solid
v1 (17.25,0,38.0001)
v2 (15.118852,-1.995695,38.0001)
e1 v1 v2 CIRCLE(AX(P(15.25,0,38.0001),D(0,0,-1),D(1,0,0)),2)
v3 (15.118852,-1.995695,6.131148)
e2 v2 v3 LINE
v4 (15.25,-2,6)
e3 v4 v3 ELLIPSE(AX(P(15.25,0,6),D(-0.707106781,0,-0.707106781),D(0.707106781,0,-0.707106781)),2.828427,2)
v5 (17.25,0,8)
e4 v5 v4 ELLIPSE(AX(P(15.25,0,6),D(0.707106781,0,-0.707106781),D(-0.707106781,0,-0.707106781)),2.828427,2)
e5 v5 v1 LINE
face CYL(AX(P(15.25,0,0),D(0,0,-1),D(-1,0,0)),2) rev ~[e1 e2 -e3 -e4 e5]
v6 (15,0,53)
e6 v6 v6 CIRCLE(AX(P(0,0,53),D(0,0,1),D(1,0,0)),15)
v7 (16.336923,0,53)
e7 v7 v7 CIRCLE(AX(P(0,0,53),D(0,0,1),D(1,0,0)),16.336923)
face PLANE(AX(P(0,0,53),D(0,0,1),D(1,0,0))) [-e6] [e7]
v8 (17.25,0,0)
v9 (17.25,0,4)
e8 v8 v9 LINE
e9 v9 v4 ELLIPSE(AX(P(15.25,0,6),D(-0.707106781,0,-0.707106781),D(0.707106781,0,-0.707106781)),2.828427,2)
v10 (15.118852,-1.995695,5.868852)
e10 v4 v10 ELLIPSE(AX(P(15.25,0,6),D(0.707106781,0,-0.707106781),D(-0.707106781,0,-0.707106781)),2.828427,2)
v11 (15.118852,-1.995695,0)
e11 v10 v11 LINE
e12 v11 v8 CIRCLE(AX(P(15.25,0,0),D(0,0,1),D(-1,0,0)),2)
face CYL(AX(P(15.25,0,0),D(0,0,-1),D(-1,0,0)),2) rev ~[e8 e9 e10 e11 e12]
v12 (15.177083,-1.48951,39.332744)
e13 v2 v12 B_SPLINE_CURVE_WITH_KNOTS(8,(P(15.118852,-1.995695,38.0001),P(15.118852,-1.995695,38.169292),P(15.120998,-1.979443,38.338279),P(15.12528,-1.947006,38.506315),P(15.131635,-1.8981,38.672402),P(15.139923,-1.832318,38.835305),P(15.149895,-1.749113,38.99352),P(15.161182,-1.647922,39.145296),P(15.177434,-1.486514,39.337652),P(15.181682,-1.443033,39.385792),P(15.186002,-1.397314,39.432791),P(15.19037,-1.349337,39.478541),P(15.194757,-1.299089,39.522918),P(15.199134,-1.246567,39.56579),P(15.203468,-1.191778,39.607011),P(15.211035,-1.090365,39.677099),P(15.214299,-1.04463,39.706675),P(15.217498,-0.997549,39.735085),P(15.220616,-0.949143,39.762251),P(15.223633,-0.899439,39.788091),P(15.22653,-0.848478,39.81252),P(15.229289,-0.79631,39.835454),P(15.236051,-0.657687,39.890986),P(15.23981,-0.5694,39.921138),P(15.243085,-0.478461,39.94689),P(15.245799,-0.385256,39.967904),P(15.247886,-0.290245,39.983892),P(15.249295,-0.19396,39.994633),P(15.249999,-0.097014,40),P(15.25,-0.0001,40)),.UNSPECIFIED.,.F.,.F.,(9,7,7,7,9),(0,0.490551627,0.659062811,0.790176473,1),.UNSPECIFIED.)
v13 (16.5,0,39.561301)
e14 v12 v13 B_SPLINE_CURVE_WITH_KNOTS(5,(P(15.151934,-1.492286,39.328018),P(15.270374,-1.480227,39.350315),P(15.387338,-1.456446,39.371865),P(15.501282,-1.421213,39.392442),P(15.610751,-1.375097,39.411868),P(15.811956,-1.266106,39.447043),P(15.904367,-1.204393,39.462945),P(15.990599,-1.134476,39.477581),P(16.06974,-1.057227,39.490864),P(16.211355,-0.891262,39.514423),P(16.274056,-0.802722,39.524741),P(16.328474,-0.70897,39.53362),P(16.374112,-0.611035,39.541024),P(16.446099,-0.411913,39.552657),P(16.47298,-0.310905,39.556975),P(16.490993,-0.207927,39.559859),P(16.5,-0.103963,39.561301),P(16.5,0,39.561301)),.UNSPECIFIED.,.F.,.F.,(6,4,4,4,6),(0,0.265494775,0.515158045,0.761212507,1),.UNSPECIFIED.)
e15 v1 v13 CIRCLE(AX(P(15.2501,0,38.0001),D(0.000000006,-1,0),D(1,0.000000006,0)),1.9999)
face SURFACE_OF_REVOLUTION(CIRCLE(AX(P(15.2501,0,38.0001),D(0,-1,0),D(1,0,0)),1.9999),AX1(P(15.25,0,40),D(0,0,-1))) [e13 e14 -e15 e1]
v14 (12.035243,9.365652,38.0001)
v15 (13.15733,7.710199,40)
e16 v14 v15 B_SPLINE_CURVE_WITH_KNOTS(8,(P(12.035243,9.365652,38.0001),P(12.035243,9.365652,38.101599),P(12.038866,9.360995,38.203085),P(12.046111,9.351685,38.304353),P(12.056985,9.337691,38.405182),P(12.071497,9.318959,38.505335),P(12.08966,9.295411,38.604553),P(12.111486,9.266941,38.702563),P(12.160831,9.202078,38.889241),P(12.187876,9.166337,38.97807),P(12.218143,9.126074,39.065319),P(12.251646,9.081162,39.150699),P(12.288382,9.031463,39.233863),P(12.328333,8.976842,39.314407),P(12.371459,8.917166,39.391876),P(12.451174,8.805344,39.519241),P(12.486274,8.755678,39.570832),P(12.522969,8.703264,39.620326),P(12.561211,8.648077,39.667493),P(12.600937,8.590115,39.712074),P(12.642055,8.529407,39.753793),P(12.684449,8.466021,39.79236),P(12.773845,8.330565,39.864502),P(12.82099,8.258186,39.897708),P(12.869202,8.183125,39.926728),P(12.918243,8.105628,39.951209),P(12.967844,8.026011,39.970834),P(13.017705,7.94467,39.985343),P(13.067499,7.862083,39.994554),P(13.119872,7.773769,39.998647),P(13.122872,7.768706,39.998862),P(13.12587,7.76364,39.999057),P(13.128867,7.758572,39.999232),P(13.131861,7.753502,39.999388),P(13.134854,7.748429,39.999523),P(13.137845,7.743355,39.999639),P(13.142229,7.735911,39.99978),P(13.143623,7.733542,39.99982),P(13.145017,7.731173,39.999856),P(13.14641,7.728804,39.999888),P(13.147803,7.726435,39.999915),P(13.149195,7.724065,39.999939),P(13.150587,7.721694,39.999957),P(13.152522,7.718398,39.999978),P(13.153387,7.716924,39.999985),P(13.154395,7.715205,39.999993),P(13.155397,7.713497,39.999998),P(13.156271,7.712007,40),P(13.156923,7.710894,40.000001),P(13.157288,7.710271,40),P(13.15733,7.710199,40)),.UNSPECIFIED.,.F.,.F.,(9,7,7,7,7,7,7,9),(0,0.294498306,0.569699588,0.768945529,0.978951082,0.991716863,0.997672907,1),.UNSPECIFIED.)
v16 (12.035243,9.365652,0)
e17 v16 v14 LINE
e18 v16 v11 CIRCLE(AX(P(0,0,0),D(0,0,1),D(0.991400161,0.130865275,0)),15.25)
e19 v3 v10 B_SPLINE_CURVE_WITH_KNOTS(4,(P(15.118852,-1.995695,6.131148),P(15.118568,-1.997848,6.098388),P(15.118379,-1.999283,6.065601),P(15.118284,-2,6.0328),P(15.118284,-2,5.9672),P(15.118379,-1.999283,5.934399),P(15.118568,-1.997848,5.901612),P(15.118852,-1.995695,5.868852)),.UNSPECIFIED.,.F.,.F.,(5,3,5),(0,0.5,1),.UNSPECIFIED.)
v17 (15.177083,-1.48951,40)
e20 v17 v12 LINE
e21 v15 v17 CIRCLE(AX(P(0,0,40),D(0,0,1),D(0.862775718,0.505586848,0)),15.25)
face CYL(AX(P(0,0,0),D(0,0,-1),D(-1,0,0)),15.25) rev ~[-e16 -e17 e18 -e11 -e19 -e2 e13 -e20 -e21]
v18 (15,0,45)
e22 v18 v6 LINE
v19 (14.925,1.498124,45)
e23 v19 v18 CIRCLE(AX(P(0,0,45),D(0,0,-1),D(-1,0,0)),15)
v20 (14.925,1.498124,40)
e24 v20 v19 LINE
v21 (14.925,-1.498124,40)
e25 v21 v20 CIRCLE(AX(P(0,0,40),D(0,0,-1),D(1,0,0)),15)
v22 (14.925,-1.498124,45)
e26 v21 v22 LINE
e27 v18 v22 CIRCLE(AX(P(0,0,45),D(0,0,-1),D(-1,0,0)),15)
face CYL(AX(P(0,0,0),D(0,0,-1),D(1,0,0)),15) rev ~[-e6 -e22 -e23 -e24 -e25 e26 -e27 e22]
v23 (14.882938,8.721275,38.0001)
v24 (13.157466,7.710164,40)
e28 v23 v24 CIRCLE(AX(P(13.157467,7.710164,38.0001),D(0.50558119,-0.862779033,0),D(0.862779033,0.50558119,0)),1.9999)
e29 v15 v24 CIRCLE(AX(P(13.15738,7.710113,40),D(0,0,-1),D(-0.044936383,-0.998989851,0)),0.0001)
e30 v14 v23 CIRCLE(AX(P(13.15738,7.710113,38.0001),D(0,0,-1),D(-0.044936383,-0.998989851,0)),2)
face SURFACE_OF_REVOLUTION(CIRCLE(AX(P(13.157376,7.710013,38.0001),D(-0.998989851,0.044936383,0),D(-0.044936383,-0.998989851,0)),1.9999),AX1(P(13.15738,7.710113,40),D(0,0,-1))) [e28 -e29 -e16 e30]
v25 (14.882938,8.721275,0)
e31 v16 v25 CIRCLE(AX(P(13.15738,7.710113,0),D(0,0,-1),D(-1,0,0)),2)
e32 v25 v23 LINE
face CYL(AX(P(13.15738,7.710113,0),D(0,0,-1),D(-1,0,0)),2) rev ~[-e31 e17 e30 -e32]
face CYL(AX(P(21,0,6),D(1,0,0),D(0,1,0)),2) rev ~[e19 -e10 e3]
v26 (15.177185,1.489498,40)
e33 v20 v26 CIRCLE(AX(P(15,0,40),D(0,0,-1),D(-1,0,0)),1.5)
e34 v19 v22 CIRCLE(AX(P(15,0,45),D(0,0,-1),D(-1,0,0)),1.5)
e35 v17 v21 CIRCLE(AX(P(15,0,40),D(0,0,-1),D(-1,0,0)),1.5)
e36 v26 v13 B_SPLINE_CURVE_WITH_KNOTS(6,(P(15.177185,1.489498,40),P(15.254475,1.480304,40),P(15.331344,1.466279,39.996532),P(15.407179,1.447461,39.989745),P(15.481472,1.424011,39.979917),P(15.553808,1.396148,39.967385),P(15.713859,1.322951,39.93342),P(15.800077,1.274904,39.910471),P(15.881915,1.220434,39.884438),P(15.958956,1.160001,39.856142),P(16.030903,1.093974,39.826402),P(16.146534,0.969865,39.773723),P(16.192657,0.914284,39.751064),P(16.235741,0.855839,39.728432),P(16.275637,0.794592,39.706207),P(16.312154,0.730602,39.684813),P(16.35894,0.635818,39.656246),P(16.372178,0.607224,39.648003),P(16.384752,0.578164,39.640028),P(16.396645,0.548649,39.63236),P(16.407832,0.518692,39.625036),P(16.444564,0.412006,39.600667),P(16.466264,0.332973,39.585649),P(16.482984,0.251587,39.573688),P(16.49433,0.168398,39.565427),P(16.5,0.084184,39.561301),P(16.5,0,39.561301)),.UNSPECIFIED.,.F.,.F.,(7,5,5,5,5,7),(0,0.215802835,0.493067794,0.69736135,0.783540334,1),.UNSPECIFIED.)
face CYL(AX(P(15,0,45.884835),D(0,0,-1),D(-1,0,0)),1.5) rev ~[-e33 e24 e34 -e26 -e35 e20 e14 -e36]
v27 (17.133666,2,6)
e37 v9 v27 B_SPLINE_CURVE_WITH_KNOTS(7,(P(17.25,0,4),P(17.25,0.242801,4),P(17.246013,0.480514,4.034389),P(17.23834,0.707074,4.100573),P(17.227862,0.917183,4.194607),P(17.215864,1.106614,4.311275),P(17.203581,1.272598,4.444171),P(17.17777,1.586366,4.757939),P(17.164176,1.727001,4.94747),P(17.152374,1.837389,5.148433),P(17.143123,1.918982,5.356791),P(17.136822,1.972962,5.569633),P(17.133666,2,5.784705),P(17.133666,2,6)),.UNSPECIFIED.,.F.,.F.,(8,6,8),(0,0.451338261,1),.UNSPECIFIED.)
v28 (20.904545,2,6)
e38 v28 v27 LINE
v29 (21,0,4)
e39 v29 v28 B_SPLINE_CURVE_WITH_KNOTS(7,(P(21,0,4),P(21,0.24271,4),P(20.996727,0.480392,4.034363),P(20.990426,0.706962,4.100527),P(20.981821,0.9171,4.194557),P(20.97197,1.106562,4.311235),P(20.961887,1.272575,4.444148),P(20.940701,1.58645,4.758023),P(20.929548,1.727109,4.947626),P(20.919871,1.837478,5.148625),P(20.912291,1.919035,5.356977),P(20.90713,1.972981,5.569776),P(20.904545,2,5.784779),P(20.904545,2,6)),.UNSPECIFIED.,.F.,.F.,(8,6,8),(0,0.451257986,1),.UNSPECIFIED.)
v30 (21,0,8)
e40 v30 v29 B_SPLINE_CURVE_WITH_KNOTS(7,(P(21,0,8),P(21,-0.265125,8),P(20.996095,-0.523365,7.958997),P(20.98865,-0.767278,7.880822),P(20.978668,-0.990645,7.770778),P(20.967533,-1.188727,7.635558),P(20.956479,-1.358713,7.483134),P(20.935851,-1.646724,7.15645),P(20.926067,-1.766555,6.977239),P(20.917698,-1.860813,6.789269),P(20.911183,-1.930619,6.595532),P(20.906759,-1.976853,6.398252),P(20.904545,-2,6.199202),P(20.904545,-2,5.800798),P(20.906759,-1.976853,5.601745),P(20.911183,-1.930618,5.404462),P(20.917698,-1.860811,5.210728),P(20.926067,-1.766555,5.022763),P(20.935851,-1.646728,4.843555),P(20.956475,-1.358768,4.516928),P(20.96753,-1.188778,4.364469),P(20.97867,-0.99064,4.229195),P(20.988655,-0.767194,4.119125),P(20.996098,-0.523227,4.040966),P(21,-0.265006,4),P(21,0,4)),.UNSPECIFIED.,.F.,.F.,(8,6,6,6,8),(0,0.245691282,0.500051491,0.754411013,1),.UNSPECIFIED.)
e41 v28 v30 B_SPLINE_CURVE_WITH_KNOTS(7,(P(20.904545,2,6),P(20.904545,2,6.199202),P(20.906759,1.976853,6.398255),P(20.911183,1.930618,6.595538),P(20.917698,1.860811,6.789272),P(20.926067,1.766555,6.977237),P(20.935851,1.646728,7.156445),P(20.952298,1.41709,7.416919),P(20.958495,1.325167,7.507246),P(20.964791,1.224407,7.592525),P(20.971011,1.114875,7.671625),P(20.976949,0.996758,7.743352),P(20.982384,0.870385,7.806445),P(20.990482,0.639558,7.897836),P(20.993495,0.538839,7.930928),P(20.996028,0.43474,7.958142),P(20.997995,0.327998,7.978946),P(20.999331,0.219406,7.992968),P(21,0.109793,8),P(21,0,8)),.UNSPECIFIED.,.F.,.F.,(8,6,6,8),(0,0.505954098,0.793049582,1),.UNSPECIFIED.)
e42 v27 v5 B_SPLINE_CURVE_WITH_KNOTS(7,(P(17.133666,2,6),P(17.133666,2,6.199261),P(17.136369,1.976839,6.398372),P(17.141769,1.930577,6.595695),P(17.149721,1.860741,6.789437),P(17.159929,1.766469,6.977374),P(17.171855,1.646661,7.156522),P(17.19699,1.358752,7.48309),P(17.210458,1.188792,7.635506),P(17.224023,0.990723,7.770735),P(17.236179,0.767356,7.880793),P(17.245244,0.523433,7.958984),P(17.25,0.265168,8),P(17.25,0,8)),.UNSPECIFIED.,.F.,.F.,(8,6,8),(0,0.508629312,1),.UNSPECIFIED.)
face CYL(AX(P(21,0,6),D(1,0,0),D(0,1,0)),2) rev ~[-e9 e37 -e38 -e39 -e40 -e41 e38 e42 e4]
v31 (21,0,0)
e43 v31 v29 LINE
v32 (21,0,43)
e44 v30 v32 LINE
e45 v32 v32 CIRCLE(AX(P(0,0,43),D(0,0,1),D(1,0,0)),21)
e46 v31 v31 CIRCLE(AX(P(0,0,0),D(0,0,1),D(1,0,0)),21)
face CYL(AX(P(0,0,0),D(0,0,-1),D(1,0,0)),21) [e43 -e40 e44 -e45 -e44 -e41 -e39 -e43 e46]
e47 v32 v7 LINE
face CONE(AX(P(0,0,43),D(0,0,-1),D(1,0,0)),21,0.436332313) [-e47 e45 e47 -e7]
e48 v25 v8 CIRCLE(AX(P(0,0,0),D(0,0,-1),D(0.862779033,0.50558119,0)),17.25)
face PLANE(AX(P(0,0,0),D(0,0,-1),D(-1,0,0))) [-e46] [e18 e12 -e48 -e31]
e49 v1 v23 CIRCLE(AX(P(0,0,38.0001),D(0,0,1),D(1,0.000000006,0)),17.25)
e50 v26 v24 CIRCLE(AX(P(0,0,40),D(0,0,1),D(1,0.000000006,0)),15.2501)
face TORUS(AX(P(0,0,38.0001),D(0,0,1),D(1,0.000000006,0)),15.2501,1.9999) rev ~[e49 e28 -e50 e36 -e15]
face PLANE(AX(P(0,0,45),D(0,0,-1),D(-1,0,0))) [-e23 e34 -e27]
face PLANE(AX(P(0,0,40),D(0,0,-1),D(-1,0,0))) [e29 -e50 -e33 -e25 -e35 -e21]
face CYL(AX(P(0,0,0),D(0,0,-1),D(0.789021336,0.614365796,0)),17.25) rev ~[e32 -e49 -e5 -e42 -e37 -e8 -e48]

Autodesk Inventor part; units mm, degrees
ref_plane "XZ Plane" through (0, 0, 0) normal (0, 1, 0) x (-1, 0, 0)
ref_plane "XY Plane" through (0, 0, 0) normal (0, 0, 1) x (1, 0, 0)
sketch "Sketch1" plane through (0, 0, 0) normal (0, 0, 1) x (1, 0, 0)
  circle A0 centre (0, 0) radius 15
  circle A1 centre (0, 0) radius 21
  dimension "d0" = 30
  dimension "d1" = 42
extrude "Extrusion1" add sketch "Sketch1" along normal blind 53
sketch "Sketch2" plane through (0, 0, 0) normal (0, 0, -1) x (-1, 0, 0)
  circle A0 centre (0, 0) radius 17.5
  circle A1 centre (0, 0) radius 21
  dimension "d4" = 35
  dimension "d5" = 42
extrude "Extrusion2" add sketch "Sketch2" along normal blind 5
chamfer "Chamfer2" distance 10 angle 25 1 edges at (-21, 0, 53)
thicken "Thicken1" operation add thickness 5 both sides no extend neighbours yes toward (0, 0, 1) faces at (-19.46042, -3.071218, -5)
sketch "Sketch3" plane through (0, 0, 0) normal (0, 0, -1) x (-1, 0, 0)
  circle A0 centre (0, 0) radius 15.25
  dimension "d16" = 30.5
extrude "Extrusion3" cut sketch "Sketch3" against normal blind 40
sketch "Sketch4" plane through (0, 0, 0) normal (0, 0, -1) x (-1, 0, 0)
  circle A0 centre (0, 0) radius 15.25 projected
  circle A1 centre (-15.25, 0) radius 2
  dimension "d19" = 4
extrude "Extrusion4" cut sketch "Sketch4" against normal blind 40 contours A1 A0 | A0 A1 picked at (-14.573606, 0) picked at (-15.90694, 0)
sketch "Sketch5" plane through (0, 0, 40) normal (0, 0, -1) x (-1, 0, 0)
  circle A0 centre (0, 0) radius 15 projected
  circle A1 centre (-15, 0) radius 1.5
  point P0 (-14.925, -1.498124)
  point P1 (-14.925, 1.498124)
  dimension "d22" = 3
extrude "Extrusion5" cut sketch "Sketch5" against normal blind 5 contours A0 A1 picked at (-15.490559, 0.062178)
ref_plane "Work Plane1" through (21, 0, 0) normal (1, 0, 0) x (0, 1, 0)
sketch "Sketch6" plane through (21, 0, 0) normal (1, 0, 0) x (0, 1, 0)
  circle A0 centre (0, 6) radius 2
  line L0 (-21, 0) -> (21, 0) projected
  point P0 (0, 0)
  dimension "d26" = 4
  dimension "d27" = 6
extrude "Extrusion6" cut sketch "Sketch6" against normal blind 10
sketch "Sketch7" plane through (0, 0, 0) normal (0, 0, -1) x (-1, 0, 0)
  line L0 (0, 0) -> (-13.610618, 10.59781)
  line L1 (0, 0) -> (-16.169661, 6.008708)
  arc A0 (-15.118852, 1.995695) -> (-15.118852, -1.995695) centre (-15.25, 0) ccw
  arc A1 (-13.610618, 10.59781) -> (-17.25, 0) centre (0, 0) ccw
  arc A2 (-15.118852, -1.995695) -> (-15.118852, 1.995695) centre (0, 0) ccw
  arc A3 (-12.032576, 9.369078) -> (-15.25, 0) centre (0, 0) ccw
  circle A4 centre (-13.15738, 7.710113) radius 2
  point P0 (-14.882938, 8.721276)
  point P1 (-12.035243, 9.365652)
  dimension "d30" = 17.25
  dimension "d31" = 17.25
  dimension "d38" = 4
extrude "Extrusion7" cut sketch "Sketch7" against normal blind 40 contours A2 A4 | A4 A2 L1 A1 | A1 L1 A2 A0 picked at (-13.724174, 8.042249)
fillet "Fillet1" radius 1.9999 2 edges at (16.6477, 4.5184, 40) (16.6171, -1.4598, 40)
properties part number "Nikon-Objective-Insulation_singe_cable_grooves_v2" material "ABS Plastic"
